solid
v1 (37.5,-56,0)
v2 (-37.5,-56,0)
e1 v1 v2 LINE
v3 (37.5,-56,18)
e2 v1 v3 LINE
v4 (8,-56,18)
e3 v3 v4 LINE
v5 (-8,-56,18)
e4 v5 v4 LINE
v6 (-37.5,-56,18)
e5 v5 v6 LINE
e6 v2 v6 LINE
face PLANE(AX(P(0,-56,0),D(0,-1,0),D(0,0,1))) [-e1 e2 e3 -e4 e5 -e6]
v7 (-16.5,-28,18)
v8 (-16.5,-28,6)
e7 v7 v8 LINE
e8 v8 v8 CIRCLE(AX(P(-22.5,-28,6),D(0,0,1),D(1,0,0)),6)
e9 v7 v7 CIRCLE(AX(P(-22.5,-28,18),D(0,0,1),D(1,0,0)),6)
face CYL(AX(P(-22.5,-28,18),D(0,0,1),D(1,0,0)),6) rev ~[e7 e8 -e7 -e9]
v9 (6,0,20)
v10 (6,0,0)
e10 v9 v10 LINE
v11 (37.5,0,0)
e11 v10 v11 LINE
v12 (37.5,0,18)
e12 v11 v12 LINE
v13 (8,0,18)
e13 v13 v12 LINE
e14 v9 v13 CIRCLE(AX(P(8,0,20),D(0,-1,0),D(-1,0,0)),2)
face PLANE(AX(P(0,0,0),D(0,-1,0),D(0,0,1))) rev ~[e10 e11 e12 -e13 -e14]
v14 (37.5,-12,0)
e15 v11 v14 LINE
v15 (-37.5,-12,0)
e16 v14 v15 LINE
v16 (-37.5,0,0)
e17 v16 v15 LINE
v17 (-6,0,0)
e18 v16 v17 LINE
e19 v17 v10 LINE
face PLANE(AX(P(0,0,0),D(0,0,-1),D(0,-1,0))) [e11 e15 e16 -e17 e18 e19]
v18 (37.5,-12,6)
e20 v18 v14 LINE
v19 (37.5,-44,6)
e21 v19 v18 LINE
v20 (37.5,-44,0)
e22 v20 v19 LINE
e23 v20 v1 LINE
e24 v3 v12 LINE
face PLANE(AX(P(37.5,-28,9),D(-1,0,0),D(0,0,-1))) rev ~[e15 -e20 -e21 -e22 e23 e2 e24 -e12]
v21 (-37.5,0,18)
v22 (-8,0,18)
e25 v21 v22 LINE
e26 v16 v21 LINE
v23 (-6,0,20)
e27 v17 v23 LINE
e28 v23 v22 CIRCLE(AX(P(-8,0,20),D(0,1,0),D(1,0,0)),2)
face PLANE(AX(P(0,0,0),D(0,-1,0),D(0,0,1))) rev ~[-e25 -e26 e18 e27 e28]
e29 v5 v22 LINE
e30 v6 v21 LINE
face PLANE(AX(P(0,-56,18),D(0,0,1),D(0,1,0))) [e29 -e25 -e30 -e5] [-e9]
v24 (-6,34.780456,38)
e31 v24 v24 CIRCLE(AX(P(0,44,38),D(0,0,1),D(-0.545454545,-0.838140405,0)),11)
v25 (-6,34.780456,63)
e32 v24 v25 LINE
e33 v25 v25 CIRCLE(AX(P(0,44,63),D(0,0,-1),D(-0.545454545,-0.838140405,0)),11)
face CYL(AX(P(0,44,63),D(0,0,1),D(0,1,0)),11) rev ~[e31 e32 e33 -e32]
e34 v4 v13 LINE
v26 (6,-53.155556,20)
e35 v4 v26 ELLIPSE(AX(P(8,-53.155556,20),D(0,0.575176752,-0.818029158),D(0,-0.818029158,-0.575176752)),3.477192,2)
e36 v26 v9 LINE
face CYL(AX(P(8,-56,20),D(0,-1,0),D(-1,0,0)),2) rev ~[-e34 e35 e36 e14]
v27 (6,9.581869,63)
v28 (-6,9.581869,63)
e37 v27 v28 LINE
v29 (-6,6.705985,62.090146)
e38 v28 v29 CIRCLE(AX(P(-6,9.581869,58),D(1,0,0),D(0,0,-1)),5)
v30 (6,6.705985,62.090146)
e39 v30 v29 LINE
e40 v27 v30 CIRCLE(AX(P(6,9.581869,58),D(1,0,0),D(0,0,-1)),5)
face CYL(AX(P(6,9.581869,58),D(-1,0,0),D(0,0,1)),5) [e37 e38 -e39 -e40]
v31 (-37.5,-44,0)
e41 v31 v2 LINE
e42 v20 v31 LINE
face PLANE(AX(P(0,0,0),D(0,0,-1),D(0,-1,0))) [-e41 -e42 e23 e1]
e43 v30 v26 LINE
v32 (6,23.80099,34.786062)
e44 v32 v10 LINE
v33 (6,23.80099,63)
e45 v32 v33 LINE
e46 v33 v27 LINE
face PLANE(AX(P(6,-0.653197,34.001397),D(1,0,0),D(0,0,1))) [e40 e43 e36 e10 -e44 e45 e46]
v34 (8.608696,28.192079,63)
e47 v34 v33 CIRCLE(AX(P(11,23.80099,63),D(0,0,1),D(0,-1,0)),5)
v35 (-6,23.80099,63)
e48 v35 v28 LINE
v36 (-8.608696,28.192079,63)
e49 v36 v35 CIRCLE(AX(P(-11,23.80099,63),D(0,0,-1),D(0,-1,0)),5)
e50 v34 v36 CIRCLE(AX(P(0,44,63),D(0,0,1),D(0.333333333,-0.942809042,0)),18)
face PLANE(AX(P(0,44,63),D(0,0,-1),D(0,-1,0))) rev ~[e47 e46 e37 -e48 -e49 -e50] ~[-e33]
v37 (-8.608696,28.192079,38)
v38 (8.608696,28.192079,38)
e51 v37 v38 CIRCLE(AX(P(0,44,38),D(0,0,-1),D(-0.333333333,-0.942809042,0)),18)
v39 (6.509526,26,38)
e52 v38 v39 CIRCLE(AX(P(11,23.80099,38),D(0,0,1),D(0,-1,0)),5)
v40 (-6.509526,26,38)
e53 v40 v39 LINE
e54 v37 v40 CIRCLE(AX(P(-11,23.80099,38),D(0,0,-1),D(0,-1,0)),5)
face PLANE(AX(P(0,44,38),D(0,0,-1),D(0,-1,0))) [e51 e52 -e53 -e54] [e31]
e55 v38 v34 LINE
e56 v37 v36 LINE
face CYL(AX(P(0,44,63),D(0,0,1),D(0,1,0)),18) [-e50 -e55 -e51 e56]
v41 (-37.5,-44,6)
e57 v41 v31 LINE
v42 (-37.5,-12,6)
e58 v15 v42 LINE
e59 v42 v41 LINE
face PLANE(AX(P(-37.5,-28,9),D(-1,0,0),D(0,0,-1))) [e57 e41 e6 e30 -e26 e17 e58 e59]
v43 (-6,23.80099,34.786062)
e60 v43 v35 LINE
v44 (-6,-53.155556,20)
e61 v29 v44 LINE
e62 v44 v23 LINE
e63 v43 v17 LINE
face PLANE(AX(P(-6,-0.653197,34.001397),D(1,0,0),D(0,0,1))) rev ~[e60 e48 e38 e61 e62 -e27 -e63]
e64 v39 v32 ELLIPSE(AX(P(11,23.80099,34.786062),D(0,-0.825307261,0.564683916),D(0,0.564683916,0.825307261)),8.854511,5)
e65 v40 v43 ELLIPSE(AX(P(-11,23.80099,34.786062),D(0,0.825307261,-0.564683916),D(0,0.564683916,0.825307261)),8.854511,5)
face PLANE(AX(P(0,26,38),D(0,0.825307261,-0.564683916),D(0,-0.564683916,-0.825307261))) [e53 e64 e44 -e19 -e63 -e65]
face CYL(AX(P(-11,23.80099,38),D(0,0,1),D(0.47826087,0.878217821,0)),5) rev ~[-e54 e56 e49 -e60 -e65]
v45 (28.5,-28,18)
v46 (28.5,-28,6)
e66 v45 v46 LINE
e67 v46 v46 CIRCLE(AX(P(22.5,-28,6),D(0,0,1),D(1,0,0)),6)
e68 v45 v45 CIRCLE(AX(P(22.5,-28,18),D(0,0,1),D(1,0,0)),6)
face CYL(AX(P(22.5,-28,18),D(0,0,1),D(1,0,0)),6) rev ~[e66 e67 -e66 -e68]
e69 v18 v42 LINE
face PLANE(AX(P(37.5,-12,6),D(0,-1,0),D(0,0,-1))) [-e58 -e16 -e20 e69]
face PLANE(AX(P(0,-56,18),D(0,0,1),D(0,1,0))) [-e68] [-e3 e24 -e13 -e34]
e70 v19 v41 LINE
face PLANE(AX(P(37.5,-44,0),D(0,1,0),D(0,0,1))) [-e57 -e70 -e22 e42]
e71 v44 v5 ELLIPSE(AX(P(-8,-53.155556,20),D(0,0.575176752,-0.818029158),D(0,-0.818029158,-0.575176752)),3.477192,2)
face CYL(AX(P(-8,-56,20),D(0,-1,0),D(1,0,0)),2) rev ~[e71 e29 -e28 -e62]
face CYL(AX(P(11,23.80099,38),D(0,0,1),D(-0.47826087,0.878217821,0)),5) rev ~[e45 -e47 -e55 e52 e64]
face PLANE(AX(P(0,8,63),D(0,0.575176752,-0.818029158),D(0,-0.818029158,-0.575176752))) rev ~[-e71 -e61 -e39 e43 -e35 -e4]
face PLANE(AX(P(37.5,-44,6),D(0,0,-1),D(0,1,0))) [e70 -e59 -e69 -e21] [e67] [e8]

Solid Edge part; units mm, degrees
sketch "Sketch1" plane through (0, 0, 0) normal (1, 0, 0) x (0, 1, 0)
  line L0 (0, 0) -> (-56, 0)
  line L1 (-56, 0) -> (-56, 18)
  line L2 (-56, 18) -> (0, 18)
  line L3 (0, 0) -> (0, 18)
extrude "Protrusion1" add sketch "Sketch1" along normal mid plane 75
sketch "Sketch2" plane through (37.5, -28, 9) normal (1, 0, 0) x (0, 1, 0)
  line L0 (-16, -9) -> (-16, -3)
  line L1 (-16, -3) -> (16, -3)
  line L2 (16, -3) -> (16, -9)
  line L3 (16, -9) -> (-16, -9)
extrude "ExtrudedCutout_1" cut sketch "Sketch2" against normal blind 100.4669
sketch "Sketch3" plane through (21.75, -28, 18) normal (0, 0, 1) x (1, 0, 0)
  circle A0 centre (0.75, 0) radius 6
  circle A1 centre (-44.25, 0) radius 6
extrude "ExtrudedCutout_2" cut sketch "Sketch3" against normal blind 51.1698
sketch "Sketch4" plane through (0, 0, 0) normal (1, 0, 0) x (0, 1, 0)
  line L0 (8, 63) -> (-56, 18)
  line L1 (-56, 18) -> (0, 18)
  line L2 (0, 0) -> (0, 18)
  line L3 (26, 38) -> (0, 0)
  line L4 (44, 38) -> (26, 38)
  line L5 (44, 38) -> (44, 63)
  line L6 (44, 63) -> (8, 63)
extrude "Protrusion_2" add sketch "Sketch4" along normal mid plane 12
sketch "Sketch5" plane through (0, 26, 63) normal (0, 0, 1) x (0, 1, 0)
  circle A0 centre (18, 0) radius 18
  circle A1 centre (18, 0) radius 11
extrude "Protrusion_3" add sketch "Sketch5" against normal blind 25
sketch "Sketch6" plane through (0, 26, 63) normal (0, 0, 1) x (0, 1, 0)
  circle A0 centre (18, 0) radius 11
extrude "Cutout_3" cut sketch "Sketch6" against normal blind 55.1556
fillet "Round_1" radius 5 3 edges at (0, 8, 63) (6, 27.0294, 50.5) (-6, 27.0294, 50.5)
fillet "Round1" radius 2 2 edges at (6, -28, 18) (-6, -28, 18)
